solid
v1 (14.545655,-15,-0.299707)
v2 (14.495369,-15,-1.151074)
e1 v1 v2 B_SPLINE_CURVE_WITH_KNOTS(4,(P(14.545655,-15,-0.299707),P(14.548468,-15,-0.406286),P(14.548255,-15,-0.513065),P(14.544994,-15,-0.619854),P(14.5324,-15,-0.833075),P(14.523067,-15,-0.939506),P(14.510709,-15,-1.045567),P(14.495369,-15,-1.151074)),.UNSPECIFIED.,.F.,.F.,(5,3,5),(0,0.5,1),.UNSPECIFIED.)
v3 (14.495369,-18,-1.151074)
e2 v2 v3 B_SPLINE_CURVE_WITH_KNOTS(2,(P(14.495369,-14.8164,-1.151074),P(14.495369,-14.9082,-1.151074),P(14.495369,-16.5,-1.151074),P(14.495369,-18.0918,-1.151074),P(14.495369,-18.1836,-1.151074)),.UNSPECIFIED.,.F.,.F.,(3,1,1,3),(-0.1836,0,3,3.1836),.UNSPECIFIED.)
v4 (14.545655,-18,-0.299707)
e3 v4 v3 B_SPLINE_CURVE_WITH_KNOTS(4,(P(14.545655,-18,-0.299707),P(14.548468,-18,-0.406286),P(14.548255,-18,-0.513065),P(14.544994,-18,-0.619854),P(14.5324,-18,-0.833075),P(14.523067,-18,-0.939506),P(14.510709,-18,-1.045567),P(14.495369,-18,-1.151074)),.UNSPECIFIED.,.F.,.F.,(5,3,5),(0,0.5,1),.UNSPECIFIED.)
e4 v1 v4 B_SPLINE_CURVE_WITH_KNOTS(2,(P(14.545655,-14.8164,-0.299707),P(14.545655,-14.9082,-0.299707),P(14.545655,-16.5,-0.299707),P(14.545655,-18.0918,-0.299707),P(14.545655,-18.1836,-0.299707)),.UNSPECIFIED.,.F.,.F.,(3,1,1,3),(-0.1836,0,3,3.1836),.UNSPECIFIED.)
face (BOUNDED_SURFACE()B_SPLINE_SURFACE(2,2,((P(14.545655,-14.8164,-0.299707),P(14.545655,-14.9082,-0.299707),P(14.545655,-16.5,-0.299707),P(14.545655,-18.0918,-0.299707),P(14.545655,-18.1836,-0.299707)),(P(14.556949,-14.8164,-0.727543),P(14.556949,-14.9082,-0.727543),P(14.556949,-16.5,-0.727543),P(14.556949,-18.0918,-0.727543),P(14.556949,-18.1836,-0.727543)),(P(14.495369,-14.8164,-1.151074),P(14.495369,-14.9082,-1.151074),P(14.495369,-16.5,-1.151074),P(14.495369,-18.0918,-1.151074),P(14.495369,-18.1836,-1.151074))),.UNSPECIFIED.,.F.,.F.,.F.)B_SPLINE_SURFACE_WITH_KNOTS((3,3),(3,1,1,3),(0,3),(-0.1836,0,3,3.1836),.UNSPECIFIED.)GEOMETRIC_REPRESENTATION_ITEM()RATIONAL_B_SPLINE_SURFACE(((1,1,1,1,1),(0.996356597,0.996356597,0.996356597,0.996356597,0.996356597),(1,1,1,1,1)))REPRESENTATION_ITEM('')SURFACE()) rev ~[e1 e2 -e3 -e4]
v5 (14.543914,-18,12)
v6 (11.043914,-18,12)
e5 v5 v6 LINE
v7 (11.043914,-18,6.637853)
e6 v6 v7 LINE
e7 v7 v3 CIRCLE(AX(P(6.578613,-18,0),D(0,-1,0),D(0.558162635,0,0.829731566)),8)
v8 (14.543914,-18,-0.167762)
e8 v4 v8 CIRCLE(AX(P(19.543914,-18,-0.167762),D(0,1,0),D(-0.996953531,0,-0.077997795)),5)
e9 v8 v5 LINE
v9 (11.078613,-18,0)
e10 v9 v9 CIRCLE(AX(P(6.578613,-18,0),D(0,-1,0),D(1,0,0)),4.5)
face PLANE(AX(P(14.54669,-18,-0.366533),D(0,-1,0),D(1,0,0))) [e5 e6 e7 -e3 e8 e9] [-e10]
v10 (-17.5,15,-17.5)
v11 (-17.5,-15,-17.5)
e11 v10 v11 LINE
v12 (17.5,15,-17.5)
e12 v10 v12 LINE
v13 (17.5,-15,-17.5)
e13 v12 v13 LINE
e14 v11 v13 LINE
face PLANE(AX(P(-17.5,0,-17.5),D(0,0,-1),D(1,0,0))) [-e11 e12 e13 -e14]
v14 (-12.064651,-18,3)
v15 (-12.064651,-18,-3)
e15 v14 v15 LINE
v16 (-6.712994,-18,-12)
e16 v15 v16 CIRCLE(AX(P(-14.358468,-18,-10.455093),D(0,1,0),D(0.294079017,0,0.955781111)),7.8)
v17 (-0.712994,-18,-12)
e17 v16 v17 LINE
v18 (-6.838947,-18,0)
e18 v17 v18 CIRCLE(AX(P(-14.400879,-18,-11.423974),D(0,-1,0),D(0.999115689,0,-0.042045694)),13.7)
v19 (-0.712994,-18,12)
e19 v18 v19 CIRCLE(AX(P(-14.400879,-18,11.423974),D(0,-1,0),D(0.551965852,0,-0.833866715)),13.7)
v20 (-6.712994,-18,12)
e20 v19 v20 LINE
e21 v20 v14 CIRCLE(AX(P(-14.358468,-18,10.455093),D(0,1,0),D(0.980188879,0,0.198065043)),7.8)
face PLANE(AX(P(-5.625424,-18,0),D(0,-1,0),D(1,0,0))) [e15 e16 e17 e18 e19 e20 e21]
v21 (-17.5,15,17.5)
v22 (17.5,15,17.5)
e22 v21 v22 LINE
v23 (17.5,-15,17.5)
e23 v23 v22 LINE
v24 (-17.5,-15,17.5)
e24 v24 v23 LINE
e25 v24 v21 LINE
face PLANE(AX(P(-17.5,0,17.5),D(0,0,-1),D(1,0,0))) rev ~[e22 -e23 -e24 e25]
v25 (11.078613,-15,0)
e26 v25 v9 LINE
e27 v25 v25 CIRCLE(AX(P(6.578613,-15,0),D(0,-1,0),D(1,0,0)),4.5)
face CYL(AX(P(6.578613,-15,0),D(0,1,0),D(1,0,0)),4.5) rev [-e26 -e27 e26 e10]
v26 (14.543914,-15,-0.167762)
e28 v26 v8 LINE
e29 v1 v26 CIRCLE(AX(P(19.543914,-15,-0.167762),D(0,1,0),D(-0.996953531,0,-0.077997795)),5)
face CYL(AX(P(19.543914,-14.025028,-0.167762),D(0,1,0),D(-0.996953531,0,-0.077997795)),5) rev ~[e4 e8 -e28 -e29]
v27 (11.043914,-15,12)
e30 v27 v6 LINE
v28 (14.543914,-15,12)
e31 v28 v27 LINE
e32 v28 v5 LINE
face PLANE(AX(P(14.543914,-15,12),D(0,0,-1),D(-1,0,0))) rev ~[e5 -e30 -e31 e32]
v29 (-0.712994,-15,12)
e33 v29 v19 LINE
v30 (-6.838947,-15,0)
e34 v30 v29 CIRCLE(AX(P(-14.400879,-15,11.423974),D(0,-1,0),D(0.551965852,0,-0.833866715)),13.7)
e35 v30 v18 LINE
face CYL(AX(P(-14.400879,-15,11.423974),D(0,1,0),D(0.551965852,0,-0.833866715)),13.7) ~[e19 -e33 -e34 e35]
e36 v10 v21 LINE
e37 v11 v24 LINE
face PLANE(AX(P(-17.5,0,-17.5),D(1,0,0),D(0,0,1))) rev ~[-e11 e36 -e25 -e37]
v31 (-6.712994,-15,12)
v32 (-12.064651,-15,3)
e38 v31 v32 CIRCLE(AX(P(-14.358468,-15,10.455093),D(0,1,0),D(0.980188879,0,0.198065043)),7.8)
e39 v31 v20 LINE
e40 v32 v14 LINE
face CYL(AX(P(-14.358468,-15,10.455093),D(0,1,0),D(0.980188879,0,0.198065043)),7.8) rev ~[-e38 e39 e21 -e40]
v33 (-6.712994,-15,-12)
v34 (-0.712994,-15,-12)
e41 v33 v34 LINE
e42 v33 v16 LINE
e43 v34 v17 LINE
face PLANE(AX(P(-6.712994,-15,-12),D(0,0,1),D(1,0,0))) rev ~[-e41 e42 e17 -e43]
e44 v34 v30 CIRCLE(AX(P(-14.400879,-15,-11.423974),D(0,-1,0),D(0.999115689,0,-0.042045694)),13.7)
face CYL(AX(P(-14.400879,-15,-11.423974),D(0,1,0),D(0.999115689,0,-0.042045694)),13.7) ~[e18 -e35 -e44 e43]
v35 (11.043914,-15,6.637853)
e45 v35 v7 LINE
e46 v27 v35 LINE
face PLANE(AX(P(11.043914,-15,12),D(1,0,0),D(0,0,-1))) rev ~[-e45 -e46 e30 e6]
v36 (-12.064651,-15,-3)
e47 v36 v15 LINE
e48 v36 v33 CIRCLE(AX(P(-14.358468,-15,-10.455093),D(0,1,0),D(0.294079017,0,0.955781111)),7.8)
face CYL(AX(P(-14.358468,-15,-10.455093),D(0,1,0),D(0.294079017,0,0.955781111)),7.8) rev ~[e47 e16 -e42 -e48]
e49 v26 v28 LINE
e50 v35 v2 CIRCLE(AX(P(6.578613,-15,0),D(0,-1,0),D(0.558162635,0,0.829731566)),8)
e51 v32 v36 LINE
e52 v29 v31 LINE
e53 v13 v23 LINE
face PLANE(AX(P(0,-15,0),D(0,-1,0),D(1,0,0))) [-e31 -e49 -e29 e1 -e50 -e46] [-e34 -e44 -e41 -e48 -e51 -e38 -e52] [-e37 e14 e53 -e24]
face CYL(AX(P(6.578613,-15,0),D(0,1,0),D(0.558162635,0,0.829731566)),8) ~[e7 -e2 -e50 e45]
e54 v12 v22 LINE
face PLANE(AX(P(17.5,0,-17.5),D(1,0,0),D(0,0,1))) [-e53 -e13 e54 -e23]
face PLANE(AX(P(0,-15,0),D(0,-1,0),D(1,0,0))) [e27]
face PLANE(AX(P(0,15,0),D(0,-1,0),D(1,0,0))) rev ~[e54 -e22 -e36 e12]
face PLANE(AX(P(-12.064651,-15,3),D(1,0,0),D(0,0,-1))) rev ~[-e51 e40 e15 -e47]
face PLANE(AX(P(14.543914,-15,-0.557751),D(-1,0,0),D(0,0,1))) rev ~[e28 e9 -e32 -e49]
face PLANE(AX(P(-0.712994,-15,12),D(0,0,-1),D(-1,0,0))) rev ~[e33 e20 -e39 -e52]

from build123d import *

# Parameters (mm, degrees)
F0_W        = 35
F0_H        = 35
F1_DEPTH    = 15
F3_R        = 4.5
F4_DEPTH    = 3
F5_T1_DEPTH = 3.9749724421
F6_R        = 5


# Not quite as in the source:
# - a fillet or chamfer that OpenCascade refuses, or shapes differently, is made with other operations: its cross-section is extruded or revolved along the edge and cut away or added


with BuildPart() as f1:
    # F0 (on Front) → F1 (new body, symmetric)
    with BuildSketch(Plane.XZ):
        Rectangle(F0_W, F0_H)
    extrude(amount=F1_DEPTH, both=True)

    # F3 (on face) → F4 (join)
    with BuildSketch(Plane.XZ.offset(15)):
        with BuildLine():
            Line((-12.0646512398, 3), (-12.0646512398, 0))
            Line((-12.0646512398, 0), (-12.0646512398, -3))
            ThreePointArc((-12.0646512398, -3), (-7.6541876394, -6.4685364284), (-6.7129943114, -12))
            Line((-6.7129943114, -12), (-0.7129943114, -12))
            ThreePointArc((-0.7129943114, -12), (-2.1988842528, -5.1949035825), (-6.8389470689, 0))
            ThreePointArc((-6.8389470689, 0), (-2.1988842528, 5.1949035825), (-0.7129943114, 12))
            Line((-0.7129943114, 12), (-6.7129943114, 12))
            ThreePointArc((-6.7129943114, 12), (-7.6541876394, 6.4685364284), (-12.0646512398, 3))
        make_face()
        with BuildLine():
            Line((11.0439136906, 12), (11.0439136906, 6.6378525317))
            ThreePointArc((11.0439136906, 6.6378525317), (-0.6094940203, -3.5115698933), (14.5591460332, -0.5577510491))
            Line((14.5591460332, -0.5577510491), (14.5439136906, -0.5577510491))
            Line((14.5439136906, -0.5577510491), (14.5439136906, 12))
            Line((14.5439136906, 12), (11.0439136906, 12))
        make_face()
        with Locations((6.578612607, 0)):
            Circle(F3_R, mode=Mode.SUBTRACT)
    extrude(amount=F4_DEPTH)

    # F5: fillet of radius 5 on 1 edges, made by hand

    # F5_s2 → F5_t1 (join)
    with BuildSketch(Plane.XZ.offset(14.0250275579)):
        with BuildLine():
            ThreePointArc((14.5591460332, -0.5577510491), (14.5477232275, -0.3629052417), (14.5439136906, -0.1677620723))
            Line((14.5439136906, -0.1677620723), (14.5439136906, -0.5577510491))
            Line((14.5439136906, -0.5577510491), (14.5591460332, -0.5577510491))
        make_face()
    extrude(amount=F5_T1_DEPTH)

    # F6
    f6_edges = [f1.edges().sort_by_distance(p)[0] for p in [
        (14.559146, -16.5, -0.557751),
    ]]
    fillet(f6_edges, radius=F6_R)


solid = f1.part
